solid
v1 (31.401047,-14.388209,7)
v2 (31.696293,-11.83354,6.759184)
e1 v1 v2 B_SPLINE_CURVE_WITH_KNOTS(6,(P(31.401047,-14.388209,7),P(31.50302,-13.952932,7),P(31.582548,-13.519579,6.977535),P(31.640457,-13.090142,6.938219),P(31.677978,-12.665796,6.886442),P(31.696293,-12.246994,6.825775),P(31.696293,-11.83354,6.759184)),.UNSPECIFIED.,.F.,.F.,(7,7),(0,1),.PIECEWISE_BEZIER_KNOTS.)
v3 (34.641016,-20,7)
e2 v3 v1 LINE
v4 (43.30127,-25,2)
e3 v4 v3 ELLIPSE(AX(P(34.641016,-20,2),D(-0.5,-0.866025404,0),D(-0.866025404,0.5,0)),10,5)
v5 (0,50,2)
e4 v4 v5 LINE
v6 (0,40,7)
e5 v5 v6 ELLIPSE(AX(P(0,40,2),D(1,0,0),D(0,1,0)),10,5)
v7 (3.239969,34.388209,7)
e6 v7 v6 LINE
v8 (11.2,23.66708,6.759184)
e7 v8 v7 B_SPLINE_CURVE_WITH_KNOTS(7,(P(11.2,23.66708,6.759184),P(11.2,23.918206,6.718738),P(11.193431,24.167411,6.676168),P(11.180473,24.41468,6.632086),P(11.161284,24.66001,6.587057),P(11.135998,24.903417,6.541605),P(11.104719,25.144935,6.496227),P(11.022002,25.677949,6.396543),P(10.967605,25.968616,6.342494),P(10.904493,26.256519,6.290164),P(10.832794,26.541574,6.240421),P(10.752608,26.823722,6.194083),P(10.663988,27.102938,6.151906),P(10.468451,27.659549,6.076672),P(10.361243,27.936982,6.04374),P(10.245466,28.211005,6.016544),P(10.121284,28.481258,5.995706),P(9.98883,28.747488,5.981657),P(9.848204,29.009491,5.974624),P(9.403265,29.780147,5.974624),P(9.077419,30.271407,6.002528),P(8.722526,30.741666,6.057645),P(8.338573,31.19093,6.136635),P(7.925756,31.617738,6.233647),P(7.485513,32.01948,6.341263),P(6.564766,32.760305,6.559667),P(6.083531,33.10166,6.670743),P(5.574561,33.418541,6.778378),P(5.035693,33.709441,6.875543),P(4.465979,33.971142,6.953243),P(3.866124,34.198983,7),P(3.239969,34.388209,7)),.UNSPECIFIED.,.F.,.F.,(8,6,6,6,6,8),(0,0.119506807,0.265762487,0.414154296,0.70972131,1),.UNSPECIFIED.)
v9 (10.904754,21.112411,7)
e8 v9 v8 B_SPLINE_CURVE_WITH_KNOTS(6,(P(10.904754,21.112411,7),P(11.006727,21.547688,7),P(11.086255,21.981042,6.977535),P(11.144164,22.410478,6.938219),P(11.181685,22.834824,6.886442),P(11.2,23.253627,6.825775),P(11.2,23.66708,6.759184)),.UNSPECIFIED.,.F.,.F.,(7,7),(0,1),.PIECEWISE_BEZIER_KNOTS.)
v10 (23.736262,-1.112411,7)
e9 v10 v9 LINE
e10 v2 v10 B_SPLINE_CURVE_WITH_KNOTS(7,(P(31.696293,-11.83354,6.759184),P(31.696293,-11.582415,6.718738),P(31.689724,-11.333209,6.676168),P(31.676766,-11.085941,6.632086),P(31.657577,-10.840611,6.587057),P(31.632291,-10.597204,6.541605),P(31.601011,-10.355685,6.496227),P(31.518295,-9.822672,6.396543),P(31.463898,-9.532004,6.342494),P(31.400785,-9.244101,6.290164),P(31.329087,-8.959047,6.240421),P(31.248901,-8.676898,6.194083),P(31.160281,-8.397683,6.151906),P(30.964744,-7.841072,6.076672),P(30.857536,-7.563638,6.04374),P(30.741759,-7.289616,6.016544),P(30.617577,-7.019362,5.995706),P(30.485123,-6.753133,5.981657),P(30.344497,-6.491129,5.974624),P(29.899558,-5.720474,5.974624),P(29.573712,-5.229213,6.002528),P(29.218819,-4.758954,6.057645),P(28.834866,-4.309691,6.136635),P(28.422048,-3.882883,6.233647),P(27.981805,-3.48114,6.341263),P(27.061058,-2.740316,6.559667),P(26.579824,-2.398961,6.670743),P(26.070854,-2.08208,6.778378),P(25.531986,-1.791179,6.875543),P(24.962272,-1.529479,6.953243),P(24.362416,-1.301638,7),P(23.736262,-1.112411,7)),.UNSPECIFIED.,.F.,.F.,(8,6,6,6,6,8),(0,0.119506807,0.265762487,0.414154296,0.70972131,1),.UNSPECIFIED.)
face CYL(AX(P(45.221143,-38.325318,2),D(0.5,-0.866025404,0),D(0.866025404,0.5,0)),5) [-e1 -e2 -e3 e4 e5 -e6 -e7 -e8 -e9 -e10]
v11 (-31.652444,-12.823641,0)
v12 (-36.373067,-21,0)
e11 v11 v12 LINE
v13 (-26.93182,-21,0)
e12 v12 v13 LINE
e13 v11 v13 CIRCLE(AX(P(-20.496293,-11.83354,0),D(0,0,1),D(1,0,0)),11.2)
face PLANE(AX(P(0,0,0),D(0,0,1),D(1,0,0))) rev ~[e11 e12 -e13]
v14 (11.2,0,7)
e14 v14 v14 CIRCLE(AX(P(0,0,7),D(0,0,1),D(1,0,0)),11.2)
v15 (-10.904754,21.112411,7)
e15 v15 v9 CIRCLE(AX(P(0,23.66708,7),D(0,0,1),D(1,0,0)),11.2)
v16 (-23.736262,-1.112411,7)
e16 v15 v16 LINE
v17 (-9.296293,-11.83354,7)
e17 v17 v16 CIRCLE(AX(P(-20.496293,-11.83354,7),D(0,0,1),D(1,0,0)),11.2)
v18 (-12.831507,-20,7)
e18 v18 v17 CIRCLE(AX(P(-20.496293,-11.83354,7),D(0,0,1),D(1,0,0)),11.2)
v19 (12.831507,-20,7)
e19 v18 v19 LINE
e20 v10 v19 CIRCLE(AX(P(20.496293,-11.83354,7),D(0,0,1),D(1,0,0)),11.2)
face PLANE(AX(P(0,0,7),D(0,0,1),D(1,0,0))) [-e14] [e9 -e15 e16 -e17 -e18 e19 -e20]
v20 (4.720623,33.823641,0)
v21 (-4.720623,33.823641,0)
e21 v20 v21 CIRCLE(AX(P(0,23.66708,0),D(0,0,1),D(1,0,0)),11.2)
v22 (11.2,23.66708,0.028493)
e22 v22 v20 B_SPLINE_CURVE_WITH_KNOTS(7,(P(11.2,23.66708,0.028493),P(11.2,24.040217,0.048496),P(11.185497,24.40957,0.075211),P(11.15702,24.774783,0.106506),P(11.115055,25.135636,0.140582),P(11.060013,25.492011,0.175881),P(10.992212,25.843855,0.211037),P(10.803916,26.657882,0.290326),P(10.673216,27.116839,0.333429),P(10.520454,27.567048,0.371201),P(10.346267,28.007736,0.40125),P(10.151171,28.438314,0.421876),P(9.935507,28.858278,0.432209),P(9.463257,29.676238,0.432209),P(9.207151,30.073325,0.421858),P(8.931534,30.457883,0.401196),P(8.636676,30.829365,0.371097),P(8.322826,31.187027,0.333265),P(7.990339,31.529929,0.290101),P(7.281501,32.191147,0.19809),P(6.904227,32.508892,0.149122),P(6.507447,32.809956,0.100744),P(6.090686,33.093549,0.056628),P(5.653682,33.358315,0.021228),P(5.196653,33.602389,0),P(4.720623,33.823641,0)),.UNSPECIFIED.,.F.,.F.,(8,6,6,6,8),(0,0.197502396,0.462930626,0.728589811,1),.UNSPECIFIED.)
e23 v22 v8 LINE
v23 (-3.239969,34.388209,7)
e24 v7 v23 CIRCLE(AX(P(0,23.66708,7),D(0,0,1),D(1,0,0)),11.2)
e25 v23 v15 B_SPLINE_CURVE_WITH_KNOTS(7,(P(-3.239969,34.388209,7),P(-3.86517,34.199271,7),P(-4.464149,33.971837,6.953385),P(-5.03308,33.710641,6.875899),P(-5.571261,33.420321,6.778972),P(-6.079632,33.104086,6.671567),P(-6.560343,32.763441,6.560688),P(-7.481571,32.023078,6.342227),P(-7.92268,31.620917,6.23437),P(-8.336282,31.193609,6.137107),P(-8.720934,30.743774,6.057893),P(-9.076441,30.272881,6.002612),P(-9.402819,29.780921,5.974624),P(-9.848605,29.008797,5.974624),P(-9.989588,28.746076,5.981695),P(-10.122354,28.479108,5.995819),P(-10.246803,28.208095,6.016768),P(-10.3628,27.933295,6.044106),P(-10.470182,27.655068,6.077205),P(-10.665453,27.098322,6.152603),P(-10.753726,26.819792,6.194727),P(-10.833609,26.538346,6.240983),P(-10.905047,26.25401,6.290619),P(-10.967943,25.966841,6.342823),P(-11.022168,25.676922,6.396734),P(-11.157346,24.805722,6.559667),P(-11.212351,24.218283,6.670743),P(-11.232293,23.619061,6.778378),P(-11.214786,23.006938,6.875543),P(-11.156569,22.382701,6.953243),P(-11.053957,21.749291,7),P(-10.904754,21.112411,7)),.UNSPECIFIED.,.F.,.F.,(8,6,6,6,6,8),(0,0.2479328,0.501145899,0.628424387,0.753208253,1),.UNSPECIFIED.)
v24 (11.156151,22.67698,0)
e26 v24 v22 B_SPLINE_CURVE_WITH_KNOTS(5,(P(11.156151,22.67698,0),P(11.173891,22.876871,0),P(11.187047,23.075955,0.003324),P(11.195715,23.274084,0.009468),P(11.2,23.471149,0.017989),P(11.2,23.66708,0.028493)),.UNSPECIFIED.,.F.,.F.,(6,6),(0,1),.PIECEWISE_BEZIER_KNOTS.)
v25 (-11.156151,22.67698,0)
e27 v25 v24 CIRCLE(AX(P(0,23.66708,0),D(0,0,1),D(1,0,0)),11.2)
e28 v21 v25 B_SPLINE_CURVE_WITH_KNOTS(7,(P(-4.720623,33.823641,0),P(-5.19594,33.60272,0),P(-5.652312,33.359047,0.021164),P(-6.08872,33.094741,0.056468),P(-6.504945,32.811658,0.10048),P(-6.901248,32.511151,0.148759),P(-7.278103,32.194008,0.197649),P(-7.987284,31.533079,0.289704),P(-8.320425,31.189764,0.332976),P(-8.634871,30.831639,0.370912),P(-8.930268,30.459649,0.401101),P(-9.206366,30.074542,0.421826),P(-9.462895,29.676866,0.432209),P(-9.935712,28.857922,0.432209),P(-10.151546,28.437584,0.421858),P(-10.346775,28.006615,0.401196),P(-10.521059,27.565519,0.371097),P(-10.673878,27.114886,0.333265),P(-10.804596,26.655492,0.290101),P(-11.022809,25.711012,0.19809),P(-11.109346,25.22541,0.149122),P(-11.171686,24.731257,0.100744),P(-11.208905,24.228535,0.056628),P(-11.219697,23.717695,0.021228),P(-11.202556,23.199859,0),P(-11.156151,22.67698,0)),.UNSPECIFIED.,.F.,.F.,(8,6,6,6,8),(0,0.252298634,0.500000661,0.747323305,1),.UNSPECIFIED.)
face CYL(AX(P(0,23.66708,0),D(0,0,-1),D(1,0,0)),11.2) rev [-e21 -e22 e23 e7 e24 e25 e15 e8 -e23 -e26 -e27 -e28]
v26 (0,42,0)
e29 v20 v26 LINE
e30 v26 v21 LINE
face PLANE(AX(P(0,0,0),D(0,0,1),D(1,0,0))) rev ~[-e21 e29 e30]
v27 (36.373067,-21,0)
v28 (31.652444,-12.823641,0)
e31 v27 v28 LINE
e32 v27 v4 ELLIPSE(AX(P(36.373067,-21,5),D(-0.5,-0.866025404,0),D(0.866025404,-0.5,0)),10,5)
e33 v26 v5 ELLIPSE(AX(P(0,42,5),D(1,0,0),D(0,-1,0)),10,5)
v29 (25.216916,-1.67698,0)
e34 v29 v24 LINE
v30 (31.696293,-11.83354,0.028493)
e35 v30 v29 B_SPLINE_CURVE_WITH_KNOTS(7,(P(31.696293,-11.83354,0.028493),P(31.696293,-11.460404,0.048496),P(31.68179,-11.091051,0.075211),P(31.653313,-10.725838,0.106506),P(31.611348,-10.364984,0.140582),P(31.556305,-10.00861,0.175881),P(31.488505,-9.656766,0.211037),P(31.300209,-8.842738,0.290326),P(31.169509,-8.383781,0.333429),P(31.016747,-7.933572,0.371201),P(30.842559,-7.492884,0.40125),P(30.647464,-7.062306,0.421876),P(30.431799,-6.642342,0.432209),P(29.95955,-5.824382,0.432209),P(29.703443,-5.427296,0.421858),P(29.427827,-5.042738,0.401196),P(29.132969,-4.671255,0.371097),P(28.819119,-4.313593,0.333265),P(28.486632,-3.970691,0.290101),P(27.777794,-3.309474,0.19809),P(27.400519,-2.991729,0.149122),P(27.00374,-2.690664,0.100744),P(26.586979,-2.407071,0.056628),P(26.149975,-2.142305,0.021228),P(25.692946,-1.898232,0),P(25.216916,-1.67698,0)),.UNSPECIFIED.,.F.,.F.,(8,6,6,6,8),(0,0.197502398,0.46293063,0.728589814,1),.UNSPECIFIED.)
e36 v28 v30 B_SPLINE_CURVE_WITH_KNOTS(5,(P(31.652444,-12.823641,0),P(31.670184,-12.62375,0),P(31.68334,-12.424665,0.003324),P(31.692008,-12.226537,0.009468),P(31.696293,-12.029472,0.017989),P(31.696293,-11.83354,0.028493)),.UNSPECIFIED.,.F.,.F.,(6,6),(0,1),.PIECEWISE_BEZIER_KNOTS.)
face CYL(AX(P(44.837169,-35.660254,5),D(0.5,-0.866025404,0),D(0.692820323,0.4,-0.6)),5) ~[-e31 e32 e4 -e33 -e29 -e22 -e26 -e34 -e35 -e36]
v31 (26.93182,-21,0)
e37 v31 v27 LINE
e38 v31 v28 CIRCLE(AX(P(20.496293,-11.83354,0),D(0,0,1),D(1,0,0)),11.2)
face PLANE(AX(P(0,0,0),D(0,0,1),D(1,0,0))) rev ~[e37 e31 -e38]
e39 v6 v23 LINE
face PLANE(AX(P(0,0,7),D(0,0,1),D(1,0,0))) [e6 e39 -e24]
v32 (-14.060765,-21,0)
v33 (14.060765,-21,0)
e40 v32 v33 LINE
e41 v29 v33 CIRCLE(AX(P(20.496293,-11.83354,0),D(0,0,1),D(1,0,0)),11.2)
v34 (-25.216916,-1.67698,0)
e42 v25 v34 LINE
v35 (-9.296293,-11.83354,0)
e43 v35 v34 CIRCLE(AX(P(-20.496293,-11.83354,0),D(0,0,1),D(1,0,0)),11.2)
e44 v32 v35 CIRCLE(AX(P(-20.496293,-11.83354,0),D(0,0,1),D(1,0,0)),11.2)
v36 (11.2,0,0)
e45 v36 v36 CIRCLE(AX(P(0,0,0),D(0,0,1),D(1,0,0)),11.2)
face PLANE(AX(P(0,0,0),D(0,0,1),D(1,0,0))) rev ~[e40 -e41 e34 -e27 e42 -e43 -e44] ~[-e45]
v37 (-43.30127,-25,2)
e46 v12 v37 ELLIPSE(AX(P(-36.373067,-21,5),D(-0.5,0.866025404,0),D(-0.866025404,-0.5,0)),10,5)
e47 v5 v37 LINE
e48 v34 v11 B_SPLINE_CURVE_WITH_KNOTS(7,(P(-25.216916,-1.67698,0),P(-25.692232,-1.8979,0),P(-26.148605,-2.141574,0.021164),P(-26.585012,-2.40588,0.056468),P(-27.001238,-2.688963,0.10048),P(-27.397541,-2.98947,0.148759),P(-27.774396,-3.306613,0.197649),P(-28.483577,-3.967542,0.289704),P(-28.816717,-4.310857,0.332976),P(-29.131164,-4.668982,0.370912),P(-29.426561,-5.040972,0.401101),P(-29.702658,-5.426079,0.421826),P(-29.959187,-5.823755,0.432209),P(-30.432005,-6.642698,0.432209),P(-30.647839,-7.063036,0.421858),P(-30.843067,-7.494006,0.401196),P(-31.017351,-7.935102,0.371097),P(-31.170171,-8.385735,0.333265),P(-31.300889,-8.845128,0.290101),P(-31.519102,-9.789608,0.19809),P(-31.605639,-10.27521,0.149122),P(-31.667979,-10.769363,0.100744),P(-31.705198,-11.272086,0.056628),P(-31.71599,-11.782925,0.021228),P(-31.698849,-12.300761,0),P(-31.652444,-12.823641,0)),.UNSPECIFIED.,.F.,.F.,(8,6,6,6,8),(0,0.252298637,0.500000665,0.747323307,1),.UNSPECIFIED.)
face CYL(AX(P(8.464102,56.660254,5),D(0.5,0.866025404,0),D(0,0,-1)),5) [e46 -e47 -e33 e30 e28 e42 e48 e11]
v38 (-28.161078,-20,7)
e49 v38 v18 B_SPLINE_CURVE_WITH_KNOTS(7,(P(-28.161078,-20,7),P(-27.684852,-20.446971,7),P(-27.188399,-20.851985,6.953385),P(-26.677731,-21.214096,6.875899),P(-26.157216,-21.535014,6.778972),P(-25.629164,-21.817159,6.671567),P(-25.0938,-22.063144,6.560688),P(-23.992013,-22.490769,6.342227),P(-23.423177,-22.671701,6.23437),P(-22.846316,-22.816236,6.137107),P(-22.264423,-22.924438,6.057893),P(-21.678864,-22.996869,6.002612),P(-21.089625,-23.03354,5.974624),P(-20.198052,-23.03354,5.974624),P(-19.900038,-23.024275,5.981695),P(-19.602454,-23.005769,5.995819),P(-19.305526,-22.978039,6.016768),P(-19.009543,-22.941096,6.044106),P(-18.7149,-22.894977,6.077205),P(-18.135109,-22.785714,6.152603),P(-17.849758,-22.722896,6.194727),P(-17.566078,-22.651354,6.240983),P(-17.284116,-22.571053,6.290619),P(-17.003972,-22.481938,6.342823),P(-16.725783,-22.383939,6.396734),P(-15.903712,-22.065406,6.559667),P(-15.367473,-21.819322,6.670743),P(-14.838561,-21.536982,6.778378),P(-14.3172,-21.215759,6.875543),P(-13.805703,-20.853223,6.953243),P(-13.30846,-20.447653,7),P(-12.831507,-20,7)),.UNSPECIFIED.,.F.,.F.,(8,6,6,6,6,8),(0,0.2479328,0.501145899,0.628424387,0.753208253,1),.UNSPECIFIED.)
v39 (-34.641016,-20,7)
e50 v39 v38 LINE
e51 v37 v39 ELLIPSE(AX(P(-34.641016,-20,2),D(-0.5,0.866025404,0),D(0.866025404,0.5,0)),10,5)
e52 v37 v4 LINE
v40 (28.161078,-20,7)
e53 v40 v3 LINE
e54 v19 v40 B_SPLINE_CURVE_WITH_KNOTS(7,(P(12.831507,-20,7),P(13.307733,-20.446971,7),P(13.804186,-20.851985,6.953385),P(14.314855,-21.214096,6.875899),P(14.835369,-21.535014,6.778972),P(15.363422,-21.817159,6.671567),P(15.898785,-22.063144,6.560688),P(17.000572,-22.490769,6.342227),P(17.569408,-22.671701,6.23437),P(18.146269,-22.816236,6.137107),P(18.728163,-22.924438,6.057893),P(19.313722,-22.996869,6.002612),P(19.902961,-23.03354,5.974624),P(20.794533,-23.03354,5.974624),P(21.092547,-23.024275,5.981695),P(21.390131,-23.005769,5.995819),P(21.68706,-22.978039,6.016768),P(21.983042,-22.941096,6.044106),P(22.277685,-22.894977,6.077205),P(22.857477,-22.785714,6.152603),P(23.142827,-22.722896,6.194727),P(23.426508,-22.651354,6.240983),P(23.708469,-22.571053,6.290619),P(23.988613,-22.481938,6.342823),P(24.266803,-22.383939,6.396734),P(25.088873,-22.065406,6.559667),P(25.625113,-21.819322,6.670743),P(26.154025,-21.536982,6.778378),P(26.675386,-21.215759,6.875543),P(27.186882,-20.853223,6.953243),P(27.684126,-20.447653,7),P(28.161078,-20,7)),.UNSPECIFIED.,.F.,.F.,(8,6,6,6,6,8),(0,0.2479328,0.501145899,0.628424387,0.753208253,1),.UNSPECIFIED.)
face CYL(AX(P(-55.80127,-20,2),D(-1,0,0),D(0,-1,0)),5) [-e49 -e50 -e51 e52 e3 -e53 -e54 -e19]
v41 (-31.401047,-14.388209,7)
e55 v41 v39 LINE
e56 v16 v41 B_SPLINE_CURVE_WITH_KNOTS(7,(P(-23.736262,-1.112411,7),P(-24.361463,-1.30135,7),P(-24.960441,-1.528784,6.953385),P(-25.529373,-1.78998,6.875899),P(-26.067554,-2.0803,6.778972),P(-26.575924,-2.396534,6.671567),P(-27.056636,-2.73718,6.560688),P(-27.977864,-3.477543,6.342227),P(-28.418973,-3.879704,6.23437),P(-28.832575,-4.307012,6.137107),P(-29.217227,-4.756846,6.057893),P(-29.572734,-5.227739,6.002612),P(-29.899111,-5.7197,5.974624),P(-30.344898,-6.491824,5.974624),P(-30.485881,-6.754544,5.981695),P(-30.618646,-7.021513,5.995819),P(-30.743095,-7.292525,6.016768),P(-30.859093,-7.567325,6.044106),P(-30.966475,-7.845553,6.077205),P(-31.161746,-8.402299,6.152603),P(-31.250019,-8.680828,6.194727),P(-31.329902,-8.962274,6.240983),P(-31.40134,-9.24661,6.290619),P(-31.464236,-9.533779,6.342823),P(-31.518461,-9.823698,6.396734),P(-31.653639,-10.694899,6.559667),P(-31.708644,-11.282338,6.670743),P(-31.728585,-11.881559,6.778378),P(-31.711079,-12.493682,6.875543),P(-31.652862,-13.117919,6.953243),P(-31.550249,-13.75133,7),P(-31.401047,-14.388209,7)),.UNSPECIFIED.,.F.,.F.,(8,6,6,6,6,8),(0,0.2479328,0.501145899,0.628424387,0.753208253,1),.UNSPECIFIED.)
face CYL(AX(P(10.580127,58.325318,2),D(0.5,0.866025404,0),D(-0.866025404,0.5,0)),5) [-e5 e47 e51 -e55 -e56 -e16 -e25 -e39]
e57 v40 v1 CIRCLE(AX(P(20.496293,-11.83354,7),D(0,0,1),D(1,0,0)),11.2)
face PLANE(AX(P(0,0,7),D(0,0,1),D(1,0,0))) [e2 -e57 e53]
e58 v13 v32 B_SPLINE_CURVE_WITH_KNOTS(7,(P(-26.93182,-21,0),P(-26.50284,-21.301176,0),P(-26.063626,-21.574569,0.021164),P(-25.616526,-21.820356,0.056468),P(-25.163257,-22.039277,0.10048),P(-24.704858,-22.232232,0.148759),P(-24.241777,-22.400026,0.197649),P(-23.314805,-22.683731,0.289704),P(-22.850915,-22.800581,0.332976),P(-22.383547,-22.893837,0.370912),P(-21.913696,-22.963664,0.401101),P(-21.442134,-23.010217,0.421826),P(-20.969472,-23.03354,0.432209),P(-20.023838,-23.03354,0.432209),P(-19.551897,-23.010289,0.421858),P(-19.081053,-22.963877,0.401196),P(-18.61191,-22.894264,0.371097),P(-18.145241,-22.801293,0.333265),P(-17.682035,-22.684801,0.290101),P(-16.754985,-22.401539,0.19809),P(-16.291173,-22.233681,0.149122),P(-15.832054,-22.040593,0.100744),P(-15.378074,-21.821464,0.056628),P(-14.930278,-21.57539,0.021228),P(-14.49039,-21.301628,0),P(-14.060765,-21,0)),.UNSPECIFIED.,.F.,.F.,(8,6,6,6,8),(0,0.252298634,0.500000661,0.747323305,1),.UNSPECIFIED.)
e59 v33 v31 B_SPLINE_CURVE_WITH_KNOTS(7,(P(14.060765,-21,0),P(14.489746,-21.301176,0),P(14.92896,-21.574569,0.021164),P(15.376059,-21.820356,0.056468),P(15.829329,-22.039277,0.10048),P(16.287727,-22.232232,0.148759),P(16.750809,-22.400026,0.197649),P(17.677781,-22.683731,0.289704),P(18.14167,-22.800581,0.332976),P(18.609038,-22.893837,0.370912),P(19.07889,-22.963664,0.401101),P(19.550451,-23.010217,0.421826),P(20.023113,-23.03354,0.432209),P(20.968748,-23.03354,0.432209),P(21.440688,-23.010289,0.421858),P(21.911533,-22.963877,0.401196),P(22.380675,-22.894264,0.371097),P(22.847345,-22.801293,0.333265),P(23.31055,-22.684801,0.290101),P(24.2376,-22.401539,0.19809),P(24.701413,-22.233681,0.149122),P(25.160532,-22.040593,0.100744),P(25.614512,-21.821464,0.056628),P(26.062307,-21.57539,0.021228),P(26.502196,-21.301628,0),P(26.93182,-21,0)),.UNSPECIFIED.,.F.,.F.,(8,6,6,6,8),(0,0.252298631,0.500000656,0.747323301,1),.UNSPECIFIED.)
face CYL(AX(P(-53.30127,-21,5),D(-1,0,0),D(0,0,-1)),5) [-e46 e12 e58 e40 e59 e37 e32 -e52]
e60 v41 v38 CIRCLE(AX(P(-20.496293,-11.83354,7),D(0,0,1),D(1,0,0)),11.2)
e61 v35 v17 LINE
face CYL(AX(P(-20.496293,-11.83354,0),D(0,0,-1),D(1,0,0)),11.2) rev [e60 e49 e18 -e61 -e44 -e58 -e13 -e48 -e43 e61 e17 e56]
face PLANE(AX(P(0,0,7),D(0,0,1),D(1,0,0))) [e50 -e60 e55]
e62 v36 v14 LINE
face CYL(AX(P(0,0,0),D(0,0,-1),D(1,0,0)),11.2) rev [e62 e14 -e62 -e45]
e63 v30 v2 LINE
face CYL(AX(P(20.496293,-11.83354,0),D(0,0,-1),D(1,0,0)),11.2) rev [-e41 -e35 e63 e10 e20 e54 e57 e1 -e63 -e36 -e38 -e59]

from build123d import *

# Parameters (mm, degrees)
F0_R        = 11.2
F1_DEPTH    = 7
F2_T1_DEPTH = 111.6025403784
F2_T3_DEPTH = 111.6025403784
F2_T5_DEPTH = 111.6025403784
F3_T1_DEPTH = 106.6025403784
F3_T3_DEPTH = 106.6025403784
F3_T5_DEPTH = 106.6025403784


# Not quite as in the source:
# - a fillet or chamfer that OpenCascade refuses, or shapes differently, is made with other operations: its cross-section is extruded or revolved along the edge and cut away or added


with BuildPart() as f1:
    # F0 (on Top) → F1 (new body)
    with BuildSketch(Plane.XY):
        Polygon((43.3012701892, -25), (0, 50), (-43.3012701892, -25), align=None)
        with Locations((-20.4962927973, -11.8335401639)):
            Circle(F0_R, mode=Mode.SUBTRACT)
        with Locations((20.4962927973, -11.8335401639)):
            Circle(F0_R, mode=Mode.SUBTRACT)
        Circle(F0_R, mode=Mode.SUBTRACT)
        with Locations((0, 23.6670803279)):
            Circle(F0_R, mode=Mode.SUBTRACT)
    extrude(amount=F1_DEPTH)

    # F2: fillet of radius 5 on 3 edges, made by hand

    # F2_s2 → F2_t1 (cut)
    with BuildSketch(Plane(origin=(27.9006350946, 48.3253175473, 0), x_dir=(0, 0, 1), z_dir=(-0.5, -0.8660254038, 0))):
        with BuildLine():
            ThreePointArc((2, 25), (5.5355339059, 23.5355339059), (7, 20))
            Line((7, 20), (7, 25))
            Line((7, 25), (2, 25))
        make_face()
    extrude(amount=F2_T1_DEPTH, mode=Mode.SUBTRACT)

    # F2_s4 → F2_t3 (cut)
    with BuildSketch(Plane.YZ.offset(-55.8012701892)):
        with BuildLine():
            ThreePointArc((-25, 2), (-23.5355339059, 5.5355339059), (-20, 7))
            Line((-20, 7), (-25, 7))
            Line((-25, 7), (-25, 2))
        make_face()
    extrude(amount=F2_T3_DEPTH, mode=Mode.SUBTRACT)

    # F2_s6 → F2_t5 (cut)
    with BuildSketch(Plane(origin=(27.9006350946, -48.3253175473, 0), x_dir=(0, 0, 1), z_dir=(-0.5, 0.8660254038, 0))):
        with BuildLine():
            ThreePointArc((2, 25), (5.5355339059, 23.5355339059), (7, 20))
            Line((7, 20), (7, 25))
            Line((7, 25), (2, 25))
        make_face()
    extrude(amount=F2_T5_DEPTH, mode=Mode.SUBTRACT)

    # F3: fillet of radius 5 on 3 edges, made by hand

    # F3_s2 → F3_t1 (cut)
    with BuildSketch(Plane(origin=(26.6506350946, -46.1602540378, 0), x_dir=(0, 0, 1), z_dir=(-0.5, 0.8660254038, 0))):
        with BuildLine():
            ThreePointArc((2, 25), (0.527864045, 23.2360679775), (0, 21))
            Line((0, 21), (0, 25))
            Line((0, 25), (2, 25))
        make_face()
    extrude(amount=F3_T1_DEPTH, mode=Mode.SUBTRACT)

    # F3_s4 → F3_t3 (cut)
    with BuildSketch(Plane.YZ.offset(-53.3012701892)):
        with BuildLine():
            ThreePointArc((-21, 0), (-23.2360679775, 0.527864045), (-25, 2))
            Line((-25, 2), (-25, 0))
            Line((-25, 0), (-21, 0))
        make_face()
    extrude(amount=F3_T3_DEPTH, mode=Mode.SUBTRACT)

    # F3_s6 → F3_t5 (cut)
    with BuildSketch(Plane(origin=(26.6506350946, 46.1602540378, 0), x_dir=(0, 0, 1), z_dir=(-0.5, -0.8660254038, 0))):
        with BuildLine():
            ThreePointArc((0, 21), (0.527864045, 23.2360679775), (2, 25))
            Line((2, 25), (0, 25))
            Line((0, 25), (0, 21))
        make_face()
    extrude(amount=F3_T5_DEPTH, mode=Mode.SUBTRACT)


solid = f1.part
